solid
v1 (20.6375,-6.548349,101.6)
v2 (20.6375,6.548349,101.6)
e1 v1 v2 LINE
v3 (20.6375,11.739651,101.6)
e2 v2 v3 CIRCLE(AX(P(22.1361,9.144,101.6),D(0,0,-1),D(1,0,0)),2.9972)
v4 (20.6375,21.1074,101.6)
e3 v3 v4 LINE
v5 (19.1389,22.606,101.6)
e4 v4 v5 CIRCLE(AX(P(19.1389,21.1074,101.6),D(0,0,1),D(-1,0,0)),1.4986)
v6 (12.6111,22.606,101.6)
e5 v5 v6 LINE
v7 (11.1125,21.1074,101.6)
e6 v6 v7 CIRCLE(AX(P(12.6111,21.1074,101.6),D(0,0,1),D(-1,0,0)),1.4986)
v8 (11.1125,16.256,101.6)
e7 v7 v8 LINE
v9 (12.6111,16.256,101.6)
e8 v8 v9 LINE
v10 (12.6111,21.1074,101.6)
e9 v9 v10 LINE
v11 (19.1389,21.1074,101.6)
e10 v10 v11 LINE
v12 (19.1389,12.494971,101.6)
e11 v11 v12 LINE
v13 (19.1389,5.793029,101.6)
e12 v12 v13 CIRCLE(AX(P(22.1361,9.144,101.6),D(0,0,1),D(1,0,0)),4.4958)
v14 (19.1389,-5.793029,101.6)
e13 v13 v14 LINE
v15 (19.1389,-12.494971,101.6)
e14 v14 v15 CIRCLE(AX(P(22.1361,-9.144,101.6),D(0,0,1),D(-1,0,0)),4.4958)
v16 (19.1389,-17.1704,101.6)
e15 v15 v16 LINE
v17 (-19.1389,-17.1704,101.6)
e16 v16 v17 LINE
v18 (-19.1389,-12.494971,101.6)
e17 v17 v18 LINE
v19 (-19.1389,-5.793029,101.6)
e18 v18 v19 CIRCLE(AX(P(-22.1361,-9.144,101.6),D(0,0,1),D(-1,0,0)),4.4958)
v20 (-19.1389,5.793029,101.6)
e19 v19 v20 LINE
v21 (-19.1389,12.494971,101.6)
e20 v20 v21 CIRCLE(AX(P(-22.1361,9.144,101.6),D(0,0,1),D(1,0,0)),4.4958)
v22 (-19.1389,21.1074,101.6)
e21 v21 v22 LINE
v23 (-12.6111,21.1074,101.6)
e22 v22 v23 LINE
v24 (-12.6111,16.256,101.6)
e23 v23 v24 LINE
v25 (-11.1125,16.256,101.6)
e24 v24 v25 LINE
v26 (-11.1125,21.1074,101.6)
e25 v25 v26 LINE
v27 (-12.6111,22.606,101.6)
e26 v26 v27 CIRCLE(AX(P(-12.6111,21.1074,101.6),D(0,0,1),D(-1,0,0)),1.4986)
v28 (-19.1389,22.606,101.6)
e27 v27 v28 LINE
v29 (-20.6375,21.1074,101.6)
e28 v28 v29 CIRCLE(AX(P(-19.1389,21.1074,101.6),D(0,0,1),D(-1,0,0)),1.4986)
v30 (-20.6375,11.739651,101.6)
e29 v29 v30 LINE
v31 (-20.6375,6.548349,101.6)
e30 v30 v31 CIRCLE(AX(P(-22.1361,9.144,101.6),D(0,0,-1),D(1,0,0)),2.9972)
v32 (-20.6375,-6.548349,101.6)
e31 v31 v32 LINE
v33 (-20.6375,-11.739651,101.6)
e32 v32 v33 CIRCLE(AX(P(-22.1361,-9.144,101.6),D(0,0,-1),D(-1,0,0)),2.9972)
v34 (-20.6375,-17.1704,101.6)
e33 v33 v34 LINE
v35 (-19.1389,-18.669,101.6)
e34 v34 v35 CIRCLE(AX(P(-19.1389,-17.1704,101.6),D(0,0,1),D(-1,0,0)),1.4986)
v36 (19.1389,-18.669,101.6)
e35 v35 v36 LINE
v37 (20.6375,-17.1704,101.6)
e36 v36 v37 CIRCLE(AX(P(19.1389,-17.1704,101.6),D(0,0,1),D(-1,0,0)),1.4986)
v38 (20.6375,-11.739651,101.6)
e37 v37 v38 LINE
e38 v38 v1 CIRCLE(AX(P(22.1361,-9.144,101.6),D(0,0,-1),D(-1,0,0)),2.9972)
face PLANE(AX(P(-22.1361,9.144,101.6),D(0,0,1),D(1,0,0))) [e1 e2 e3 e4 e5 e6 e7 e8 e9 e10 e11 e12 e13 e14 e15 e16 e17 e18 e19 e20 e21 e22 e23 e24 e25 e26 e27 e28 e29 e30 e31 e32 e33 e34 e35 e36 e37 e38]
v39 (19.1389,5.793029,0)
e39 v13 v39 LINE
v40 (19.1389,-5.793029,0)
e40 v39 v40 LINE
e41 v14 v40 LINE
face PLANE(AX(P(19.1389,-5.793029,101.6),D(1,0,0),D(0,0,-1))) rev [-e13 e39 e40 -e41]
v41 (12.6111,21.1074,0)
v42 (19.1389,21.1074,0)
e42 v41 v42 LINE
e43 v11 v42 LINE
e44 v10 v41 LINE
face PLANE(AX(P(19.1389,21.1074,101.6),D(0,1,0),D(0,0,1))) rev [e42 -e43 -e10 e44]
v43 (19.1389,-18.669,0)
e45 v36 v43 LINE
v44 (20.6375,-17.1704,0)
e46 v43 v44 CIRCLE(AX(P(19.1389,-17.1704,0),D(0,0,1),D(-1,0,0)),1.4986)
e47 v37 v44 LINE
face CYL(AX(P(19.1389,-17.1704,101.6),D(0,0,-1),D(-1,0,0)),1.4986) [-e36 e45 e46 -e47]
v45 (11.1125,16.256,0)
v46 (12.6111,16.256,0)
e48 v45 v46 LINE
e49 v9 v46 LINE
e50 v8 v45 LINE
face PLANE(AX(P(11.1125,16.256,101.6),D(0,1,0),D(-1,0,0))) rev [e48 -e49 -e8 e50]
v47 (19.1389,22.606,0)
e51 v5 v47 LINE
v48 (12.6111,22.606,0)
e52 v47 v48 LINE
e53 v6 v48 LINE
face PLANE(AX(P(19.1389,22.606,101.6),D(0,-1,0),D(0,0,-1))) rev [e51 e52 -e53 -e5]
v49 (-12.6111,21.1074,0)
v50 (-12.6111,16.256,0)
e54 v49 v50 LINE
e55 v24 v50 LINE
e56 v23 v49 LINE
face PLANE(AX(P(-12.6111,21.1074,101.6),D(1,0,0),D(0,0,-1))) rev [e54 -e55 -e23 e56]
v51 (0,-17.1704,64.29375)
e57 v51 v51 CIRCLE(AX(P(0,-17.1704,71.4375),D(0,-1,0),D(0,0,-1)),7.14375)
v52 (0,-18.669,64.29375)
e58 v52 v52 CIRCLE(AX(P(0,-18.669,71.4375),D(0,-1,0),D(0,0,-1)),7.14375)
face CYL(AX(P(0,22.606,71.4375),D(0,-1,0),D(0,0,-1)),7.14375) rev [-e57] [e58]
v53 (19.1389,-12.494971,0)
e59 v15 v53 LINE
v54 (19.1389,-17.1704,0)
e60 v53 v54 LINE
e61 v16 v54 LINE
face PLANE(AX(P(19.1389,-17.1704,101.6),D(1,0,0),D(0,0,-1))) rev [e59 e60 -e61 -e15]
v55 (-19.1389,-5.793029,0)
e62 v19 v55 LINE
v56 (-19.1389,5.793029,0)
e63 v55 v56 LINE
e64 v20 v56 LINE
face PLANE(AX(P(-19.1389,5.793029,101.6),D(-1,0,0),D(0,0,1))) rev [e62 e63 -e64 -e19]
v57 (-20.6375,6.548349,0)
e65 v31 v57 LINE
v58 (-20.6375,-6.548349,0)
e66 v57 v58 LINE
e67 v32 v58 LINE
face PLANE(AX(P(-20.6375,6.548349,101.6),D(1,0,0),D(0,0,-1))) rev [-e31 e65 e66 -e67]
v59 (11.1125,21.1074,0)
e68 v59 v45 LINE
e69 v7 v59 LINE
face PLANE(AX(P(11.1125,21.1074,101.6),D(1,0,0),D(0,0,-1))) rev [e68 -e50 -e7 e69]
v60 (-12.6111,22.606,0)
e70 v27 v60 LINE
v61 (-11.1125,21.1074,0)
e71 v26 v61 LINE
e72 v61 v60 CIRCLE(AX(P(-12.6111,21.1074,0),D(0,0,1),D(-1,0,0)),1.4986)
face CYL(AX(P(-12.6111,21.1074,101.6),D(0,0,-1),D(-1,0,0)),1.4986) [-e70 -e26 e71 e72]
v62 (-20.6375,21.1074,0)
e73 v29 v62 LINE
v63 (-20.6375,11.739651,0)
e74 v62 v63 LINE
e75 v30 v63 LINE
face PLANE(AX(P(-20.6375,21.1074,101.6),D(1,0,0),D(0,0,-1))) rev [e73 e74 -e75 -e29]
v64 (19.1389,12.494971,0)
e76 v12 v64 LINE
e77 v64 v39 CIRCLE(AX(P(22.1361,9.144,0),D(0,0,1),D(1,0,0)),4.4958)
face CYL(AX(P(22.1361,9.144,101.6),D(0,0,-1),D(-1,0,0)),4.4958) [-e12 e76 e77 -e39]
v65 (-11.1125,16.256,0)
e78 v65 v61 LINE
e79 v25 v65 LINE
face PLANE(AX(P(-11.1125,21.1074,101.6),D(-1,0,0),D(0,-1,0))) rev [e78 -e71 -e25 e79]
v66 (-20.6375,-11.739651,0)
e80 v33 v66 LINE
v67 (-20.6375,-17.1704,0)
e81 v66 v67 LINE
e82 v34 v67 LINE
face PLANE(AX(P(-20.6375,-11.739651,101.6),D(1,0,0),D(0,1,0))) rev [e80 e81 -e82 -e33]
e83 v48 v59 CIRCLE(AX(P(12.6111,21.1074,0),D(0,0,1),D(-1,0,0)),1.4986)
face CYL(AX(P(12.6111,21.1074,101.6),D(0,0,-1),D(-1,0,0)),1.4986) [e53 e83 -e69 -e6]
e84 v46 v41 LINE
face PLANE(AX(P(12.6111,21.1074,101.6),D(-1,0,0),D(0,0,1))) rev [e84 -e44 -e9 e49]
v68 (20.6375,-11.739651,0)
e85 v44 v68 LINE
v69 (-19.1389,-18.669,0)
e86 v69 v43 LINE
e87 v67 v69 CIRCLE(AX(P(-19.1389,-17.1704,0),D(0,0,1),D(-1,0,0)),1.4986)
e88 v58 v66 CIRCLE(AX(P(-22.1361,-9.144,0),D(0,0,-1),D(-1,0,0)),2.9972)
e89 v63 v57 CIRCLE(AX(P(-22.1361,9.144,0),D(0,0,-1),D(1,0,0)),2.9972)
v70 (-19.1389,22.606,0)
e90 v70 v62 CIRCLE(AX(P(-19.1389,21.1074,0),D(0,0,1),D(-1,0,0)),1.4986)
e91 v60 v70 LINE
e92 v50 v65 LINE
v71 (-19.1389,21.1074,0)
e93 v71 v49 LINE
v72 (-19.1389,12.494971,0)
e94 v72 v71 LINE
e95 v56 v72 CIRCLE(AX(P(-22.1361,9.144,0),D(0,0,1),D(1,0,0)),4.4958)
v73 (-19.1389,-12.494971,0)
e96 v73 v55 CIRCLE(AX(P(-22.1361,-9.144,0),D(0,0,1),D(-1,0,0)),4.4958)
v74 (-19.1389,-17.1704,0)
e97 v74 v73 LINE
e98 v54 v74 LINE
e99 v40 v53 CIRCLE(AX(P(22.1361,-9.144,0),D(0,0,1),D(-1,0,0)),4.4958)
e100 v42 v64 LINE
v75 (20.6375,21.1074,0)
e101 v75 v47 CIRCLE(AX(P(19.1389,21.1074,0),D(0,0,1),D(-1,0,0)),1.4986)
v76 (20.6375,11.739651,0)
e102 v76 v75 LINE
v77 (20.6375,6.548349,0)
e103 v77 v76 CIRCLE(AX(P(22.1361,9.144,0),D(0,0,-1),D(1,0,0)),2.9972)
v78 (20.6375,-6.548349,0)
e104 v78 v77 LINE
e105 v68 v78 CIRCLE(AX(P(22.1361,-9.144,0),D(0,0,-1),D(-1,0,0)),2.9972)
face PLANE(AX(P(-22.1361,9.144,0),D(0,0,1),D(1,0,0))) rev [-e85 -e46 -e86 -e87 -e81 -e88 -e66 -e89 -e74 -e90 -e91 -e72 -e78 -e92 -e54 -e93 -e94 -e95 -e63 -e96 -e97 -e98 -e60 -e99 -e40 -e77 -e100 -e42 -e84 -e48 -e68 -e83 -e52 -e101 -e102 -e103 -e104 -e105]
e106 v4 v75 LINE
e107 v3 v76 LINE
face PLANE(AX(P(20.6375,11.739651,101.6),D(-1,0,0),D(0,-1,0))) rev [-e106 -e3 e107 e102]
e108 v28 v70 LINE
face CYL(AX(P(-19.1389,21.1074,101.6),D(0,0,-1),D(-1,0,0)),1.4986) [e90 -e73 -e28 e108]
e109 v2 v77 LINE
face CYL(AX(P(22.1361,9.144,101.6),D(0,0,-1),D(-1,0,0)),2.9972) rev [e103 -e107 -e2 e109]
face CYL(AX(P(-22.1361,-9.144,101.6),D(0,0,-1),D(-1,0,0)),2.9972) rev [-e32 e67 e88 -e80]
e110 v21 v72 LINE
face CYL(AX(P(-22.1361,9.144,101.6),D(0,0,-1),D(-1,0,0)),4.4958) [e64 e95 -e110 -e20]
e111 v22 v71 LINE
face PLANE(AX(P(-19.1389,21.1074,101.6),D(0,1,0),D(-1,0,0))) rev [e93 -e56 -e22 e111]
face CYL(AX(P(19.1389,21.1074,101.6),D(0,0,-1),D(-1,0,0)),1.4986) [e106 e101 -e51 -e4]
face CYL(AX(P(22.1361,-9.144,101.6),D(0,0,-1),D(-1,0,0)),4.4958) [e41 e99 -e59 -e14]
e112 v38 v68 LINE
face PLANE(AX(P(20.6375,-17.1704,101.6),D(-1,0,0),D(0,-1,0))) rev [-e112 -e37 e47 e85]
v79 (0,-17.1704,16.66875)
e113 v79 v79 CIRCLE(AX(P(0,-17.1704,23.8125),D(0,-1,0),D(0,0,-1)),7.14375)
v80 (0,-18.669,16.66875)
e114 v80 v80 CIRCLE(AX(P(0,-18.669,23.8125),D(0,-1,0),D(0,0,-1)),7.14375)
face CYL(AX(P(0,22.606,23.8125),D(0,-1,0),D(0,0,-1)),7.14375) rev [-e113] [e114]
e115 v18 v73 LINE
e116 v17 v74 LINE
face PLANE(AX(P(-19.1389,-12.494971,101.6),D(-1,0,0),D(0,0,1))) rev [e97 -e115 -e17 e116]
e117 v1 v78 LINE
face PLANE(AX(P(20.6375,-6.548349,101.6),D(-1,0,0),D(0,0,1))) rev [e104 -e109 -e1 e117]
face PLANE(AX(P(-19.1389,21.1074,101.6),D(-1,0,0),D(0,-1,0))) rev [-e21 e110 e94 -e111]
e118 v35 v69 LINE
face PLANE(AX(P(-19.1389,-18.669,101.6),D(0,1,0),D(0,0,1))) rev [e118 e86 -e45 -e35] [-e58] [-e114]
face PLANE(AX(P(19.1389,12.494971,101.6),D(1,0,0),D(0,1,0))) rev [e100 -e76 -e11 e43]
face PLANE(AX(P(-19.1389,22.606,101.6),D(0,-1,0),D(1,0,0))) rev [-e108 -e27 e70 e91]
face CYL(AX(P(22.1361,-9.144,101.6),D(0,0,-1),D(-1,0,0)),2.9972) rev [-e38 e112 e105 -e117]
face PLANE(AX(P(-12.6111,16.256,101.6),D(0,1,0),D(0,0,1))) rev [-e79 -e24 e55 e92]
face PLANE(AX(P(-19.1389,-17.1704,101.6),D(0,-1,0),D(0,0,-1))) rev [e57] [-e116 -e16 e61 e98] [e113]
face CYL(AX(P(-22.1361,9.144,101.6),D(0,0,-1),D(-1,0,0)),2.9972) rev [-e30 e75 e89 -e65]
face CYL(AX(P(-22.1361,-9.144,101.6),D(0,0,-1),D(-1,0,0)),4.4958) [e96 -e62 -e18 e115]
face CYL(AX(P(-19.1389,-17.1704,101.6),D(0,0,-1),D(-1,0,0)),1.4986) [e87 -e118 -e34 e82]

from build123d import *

# Parameters (mm, degrees)
BASE_EXTRUDE_DEPTH = 101.6
HOLE1_START        = -18.669
HOLE1_OUTLINE_R    = 7.14375
HOLE1_DEPTH        = 1.4986
LPATTERN2_COUNT    = 2
LPATTERN2_PITCH    = 47.625


# Read off the part's stored shape, not the designer's step: Hole1
with BuildPart() as part:
    # Sketch1 → Base-Extrude (new body)
    with BuildSketch(Plane.XY):
        with BuildLine():
            Line((-20.6375, 21.1074), (-20.6375, 11.73965134))
            ThreePointArc((-20.6375, 11.73965134), (-19.1389, 9.144), (-20.6375, 6.54834866))
            Line((-20.6375, 6.54834866), (-20.6375, -6.54834866))
            ThreePointArc((-20.6375, -6.54834866), (-19.1389, -9.144), (-20.6375, -11.73965134))
            Line((-20.6375, -11.73965134), (-20.6375, -17.1704))
            ThreePointArc((-20.6375, -17.1704), (-20.198570222, -18.230070222), (-19.1389, -18.669))
            Line((-19.1389, -18.669), (19.1389, -18.669))
            ThreePointArc((19.1389, -18.669), (20.198570222, -18.230070222), (20.6375, -17.1704))
            Line((20.6375, -17.1704), (20.6375, -11.73965134))
            ThreePointArc((20.6375, -11.73965134), (19.1389, -9.144), (20.6375, -6.54834866))
            Line((20.6375, -6.54834866), (20.6375, 6.54834866))
            ThreePointArc((20.6375, 6.54834866), (19.1389, 9.144), (20.6375, 11.73965134))
            Line((20.6375, 11.73965134), (20.6375, 21.1074))
            ThreePointArc((20.6375, 21.1074), (20.198570222, 22.167070222), (19.1389, 22.606))
            Line((19.1389, 22.606), (12.6111, 22.606))
            ThreePointArc((12.6111, 22.606), (11.551429778, 22.167070222), (11.1125, 21.1074))
            Line((11.1125, 21.1074), (11.1125, 16.256))
            Line((11.1125, 16.256), (12.6111, 16.256))
            Line((12.6111, 16.256), (12.6111, 21.1074))
            Line((12.6111, 21.1074), (19.1389, 21.1074))
            Line((19.1389, 21.1074), (19.1389, 12.494971471))
            ThreePointArc((19.1389, 12.494971471), (17.6403, 9.144), (19.1389, 5.793028529))
            Line((19.1389, 5.793028529), (19.1389, -5.793028529))
            ThreePointArc((19.1389, -5.793028529), (17.6403, -9.144), (19.1389, -12.494971471))
            Line((19.1389, -12.494971471), (19.1389, -17.1704))
            Line((19.1389, -17.1704), (-19.1389, -17.1704))
            Line((-19.1389, -17.1704), (-19.1389, -12.494971471))
            ThreePointArc((-19.1389, -12.494971471), (-17.6403, -9.144), (-19.1389, -5.793028529))
            Line((-19.1389, -5.793028529), (-19.1389, 5.793028529))
            ThreePointArc((-19.1389, 5.793028529), (-17.6403, 9.144), (-19.1389, 12.494971471))
            Line((-19.1389, 12.494971471), (-19.1389, 21.1074))
            Line((-19.1389, 21.1074), (-12.6111, 21.1074))
            Line((-12.6111, 21.1074), (-12.6111, 16.256))
            Line((-12.6111, 16.256), (-11.1125, 16.256))
            Line((-11.1125, 16.256), (-11.1125, 21.1074))
            ThreePointArc((-11.1125, 21.1074), (-11.551429778, 22.167070222), (-12.6111, 22.606))
            Line((-12.6111, 22.606), (-19.1389, 22.606))
            ThreePointArc((-19.1389, 22.606), (-20.198570222, 22.167070222), (-20.6375, 21.1074))
        make_face()
    extrude(amount=BASE_EXTRUDE_DEPTH)

    # Hole1 outline → Hole1 (cut)
    with BuildSketch(Plane(origin=(0, 0, 0), x_dir=(1, 0, 0), z_dir=(0, 1, 0)).offset(HOLE1_START)):
        with Locations((0, -23.8125)):
            Circle(HOLE1_OUTLINE_R)
    hole1 = extrude(amount=HOLE1_DEPTH, mode=Mode.SUBTRACT)

    # LPattern2: Hole1 ×2
    with Locations(*[(0, 0, i * LPATTERN2_PITCH) for i in range(1, LPATTERN2_COUNT)]):
        add(hole1, mode=Mode.SUBTRACT)


solid = part.part
